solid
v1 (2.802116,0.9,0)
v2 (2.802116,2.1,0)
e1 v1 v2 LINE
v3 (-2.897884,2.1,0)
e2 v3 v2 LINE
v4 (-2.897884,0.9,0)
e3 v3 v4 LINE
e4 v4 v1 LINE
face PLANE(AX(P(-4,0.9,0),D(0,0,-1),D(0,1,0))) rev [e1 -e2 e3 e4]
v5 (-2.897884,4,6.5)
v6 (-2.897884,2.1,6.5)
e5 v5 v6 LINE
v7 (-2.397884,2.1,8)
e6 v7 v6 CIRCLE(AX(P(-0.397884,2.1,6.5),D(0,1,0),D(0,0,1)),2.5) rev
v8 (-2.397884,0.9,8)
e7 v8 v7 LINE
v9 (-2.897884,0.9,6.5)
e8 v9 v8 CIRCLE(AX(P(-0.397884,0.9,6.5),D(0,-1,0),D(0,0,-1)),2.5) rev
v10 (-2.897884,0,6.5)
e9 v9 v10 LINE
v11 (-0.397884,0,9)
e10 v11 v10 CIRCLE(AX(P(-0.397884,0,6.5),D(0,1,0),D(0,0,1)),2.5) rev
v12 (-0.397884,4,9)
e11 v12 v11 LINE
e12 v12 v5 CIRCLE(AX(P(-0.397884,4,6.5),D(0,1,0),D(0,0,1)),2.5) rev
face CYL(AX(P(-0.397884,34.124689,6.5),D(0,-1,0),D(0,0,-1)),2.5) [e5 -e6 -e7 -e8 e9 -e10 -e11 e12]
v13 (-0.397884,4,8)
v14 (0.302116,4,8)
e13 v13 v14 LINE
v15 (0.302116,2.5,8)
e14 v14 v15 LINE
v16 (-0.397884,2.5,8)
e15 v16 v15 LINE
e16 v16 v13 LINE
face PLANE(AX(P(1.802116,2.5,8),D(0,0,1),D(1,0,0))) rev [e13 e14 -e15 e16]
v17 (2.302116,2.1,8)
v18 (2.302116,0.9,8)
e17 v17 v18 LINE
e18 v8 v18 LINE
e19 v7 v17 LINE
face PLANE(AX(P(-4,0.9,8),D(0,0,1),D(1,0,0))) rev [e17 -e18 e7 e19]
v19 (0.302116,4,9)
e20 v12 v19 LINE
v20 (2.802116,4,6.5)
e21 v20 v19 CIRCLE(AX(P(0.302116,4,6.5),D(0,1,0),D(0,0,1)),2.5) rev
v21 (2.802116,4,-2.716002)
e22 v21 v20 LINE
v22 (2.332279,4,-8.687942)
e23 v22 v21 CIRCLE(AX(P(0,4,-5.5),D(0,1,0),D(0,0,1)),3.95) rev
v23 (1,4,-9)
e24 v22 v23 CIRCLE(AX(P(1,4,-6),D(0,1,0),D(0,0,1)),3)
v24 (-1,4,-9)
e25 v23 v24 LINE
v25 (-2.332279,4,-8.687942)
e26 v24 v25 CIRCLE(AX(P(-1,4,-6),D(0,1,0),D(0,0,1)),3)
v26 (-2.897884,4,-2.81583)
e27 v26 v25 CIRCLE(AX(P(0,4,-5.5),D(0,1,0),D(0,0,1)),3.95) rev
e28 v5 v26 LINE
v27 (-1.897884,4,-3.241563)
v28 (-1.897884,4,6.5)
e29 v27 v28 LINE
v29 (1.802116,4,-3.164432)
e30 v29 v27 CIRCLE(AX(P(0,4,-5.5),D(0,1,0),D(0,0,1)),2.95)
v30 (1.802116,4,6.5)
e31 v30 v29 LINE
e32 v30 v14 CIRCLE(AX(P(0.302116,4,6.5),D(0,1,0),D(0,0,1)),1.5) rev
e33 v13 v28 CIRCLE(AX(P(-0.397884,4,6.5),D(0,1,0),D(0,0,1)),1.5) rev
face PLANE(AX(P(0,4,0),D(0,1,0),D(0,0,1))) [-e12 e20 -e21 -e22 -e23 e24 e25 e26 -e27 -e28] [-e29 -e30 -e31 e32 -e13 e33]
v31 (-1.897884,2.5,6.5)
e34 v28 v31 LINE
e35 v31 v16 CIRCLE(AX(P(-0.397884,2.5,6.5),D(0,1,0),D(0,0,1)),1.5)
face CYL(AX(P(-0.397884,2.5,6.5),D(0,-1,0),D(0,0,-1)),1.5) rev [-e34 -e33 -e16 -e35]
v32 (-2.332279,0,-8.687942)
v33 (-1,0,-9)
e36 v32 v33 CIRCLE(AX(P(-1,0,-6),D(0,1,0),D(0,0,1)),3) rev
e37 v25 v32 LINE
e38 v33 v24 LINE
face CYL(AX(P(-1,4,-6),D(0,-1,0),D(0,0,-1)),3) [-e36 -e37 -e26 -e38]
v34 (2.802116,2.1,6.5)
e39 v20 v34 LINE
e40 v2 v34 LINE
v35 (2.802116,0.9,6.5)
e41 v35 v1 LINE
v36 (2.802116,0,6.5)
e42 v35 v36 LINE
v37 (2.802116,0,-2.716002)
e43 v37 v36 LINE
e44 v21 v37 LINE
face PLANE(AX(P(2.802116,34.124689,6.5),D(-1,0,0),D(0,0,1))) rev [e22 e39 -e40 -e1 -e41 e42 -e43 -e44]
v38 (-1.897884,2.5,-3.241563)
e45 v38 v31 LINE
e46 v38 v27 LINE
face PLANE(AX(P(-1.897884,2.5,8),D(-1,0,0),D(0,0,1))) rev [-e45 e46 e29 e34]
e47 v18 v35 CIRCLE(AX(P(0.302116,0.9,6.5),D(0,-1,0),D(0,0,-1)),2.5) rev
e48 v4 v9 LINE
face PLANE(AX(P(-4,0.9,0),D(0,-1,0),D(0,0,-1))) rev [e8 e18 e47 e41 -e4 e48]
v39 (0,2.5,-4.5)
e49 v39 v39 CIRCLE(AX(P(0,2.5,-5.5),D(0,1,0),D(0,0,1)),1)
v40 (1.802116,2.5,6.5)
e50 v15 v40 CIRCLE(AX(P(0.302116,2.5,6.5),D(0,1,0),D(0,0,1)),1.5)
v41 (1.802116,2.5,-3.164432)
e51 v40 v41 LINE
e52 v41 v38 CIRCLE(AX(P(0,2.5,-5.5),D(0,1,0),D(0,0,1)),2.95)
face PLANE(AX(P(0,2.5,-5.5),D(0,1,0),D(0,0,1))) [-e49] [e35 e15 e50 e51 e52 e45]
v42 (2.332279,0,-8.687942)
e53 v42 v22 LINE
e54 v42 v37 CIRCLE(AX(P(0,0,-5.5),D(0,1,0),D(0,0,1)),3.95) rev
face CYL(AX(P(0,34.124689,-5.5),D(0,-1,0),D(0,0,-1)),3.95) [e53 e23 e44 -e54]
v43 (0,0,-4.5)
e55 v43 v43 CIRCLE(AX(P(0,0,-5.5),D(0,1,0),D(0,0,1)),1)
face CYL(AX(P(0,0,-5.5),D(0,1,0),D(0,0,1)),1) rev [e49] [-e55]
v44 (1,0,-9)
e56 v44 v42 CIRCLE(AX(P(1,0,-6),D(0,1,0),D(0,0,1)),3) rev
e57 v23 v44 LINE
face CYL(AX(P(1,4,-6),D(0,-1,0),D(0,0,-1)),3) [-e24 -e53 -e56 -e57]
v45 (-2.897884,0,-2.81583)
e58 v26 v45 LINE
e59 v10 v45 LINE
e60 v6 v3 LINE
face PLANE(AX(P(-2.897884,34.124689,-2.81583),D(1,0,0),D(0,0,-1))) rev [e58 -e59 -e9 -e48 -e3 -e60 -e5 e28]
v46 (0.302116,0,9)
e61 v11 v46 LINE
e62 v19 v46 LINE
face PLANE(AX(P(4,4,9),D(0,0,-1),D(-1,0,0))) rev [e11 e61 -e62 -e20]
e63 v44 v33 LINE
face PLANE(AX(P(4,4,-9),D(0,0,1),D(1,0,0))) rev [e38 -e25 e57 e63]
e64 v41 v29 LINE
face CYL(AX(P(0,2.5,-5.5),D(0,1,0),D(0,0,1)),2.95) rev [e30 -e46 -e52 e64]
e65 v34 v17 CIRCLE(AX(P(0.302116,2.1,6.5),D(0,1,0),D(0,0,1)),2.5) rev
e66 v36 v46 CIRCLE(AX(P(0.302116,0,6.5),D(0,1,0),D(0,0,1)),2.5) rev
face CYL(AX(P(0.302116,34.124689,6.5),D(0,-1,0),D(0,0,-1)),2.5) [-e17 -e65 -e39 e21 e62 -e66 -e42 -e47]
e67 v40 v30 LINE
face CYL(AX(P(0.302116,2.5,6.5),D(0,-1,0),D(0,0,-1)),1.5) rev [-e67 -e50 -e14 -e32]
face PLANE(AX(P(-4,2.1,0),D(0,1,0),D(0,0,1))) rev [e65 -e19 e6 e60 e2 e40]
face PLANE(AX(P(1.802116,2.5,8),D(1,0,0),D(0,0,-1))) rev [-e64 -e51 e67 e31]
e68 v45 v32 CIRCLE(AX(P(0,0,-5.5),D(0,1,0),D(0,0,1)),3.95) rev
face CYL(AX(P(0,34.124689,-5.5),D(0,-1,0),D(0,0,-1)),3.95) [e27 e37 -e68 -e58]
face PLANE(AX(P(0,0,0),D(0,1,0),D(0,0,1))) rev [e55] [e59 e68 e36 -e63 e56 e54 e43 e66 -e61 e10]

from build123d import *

# Parameters (mm, degrees)
SKETCH_1_W          = 8
SKETCH_1_H          = 18
EXTRUDE_1_DEPTH     = 4
CUT_EXTRUDE_4_DEPTH = 1.5
SKETCH_6_W          = 8
SKETCH_6_H          = 1.2
CUT_EXTRUDE_5_DEPTH = 13.68857754
SKETCH_7_R          = 1
CUT_EXTRUDE_6_DEPTH = 11.161200716
FILLET_1_R          = 3
FILLET_2_R          = 2
FILLET_3_R          = 1.5
CUT_EXTRUDE_START   = -4
CUT_EXTRUDE_7_DEPTH = 4


# Read off the part's stored shape, not the designer's step: 切除-拉伸7
with BuildPart() as part:
    # 草图1 → 凸台-拉伸1 (new body)
    with BuildSketch(Plane(origin=(0, 0, 0), x_dir=(1, 0, 0), z_dir=(0, 1, 0))):
        Rectangle(SKETCH_1_W, SKETCH_1_H)
    extrude(amount=EXTRUDE_1_DEPTH)

    # 草图5 → 切除-拉伸4 (cut)
    with BuildSketch(Plane(origin=(0, 4, 0), x_dir=(1, 0, 0), z_dir=(0, 1, 0))):
        with BuildLine():
            Line((1.802116427, -8), (-1.897883573, -8))
            Line((-1.897883573, -8), (-1.897883573, 3.241562942))
            ThreePointArc((-1.897883573, 3.241562942), (0.061482678, 8.449359232), (1.802116427, 3.164432321))
            Line((1.802116427, 3.164432321), (1.802116427, -8))
        make_face()
    extrude(amount=-CUT_EXTRUDE_4_DEPTH, mode=Mode.SUBTRACT)

    # 草图6 → 切除-拉伸5 (cut, through all)
    with BuildSketch(Plane(origin=(4, 0, 0), x_dir=(0, 0, -1), z_dir=(1, 0, 0))):
        with Locations((-4, 1.5)):
            Rectangle(SKETCH_6_W, SKETCH_6_H)
    extrude(amount=-CUT_EXTRUDE_5_DEPTH, mode=Mode.SUBTRACT)

    # 草图7 → 切除-拉伸6 (cut, through all)
    with BuildSketch(Plane(origin=(0, 2.5, 0), x_dir=(1, 0, 0), z_dir=(0, 1, 0))):
        with Locations(Location((0, 5.5, 0), (0, 0, 270))):
            Circle(SKETCH_7_R)
    extrude(amount=-CUT_EXTRUDE_6_DEPTH, mode=Mode.SUBTRACT)

    # 圆角1
    fillet_1_edges = [part.edges().sort_by_distance(p)[0] for p in [
        (-4, 2, -9),
        (4, 2, -9),
    ]]
    fillet(fillet_1_edges, radius=FILLET_1_R)

    # 圆角2
    # the kernel refuses this fillet: 2 mm, written as the material it takes off along each edge
    with BuildSketch(Plane(origin=(4, -5, 9), x_dir=(0, 0, -1), z_dir=(0, 1, 0)), Plane(origin=(-4, -5, 9), x_dir=(1, 0, 0), z_dir=(0, 1, 0))) as fillet_2_piece_1:
        with BuildLine():
            CenterArc((FILLET_2_R, FILLET_2_R), FILLET_2_R, 180, 90)
            Line((0, FILLET_2_R), (0, 0))
            Line((0, 0), (FILLET_2_R, 0))
        make_face()
    extrude(amount=14, mode=Mode.SUBTRACT)

    # 圆角3
    fillet_3_edges = [part.edges().sort_by_distance(p)[0] for p in [
        (1.802116427, 3.25, 8),
        (-1.897883573, 3.25, 8),
    ]]
    fillet(fillet_3_edges, radius=FILLET_3_R)

    # 切除-拉伸7 outline → 切除-拉伸7 (cut)
    with BuildSketch(Plane(origin=(0, 4, 0), x_dir=(1, 0, 0), z_dir=(0, 1, 0)).offset(CUT_EXTRUDE_START)):
        with BuildLine():
            ThreePointArc((-2.897883573, 2.815829589), (-3.931803195, 5.878713127), (-2.332278942, 8.687942116))
            ThreePointArc((-2.332278942, 8.687942116), (-3.549199564, 7.581638893), (-4, 6))
            Line((-4, 6), (-4, -7))
            ThreePointArc((-4, -7), (-3.414213562, -8.414213562), (-2, -9))
            Line((-2, -9), (-0.397883573, -9))
            ThreePointArc((-0.397883573, -9), (-2.165650526, -8.267766953), (-2.897883573, -6.5))
            Line((-2.897883573, -6.5), (-2.897883573, 2.815829589))
        make_face()
        with BuildLine():
            Line((4, -7), (4, 6))
            ThreePointArc((4, 6), (3.549199564, 7.581638893), (2.332278942, 8.687942117))
            ThreePointArc((2.332278942, 8.687942117), (3.937831945, 5.809805707), (2.802116427, 2.71600224))
            Line((2.802116427, 2.71600224), (2.802116427, -6.5))
            ThreePointArc((2.802116427, -6.5), (2.06988338, -8.267766953), (0.302116427, -9))
            Line((0.302116427, -9), (2, -9))
            ThreePointArc((2, -9), (3.414213562, -8.414213562), (4, -7))
        make_face()
    extrude(amount=CUT_EXTRUDE_7_DEPTH, mode=Mode.SUBTRACT)


solid = part.part
